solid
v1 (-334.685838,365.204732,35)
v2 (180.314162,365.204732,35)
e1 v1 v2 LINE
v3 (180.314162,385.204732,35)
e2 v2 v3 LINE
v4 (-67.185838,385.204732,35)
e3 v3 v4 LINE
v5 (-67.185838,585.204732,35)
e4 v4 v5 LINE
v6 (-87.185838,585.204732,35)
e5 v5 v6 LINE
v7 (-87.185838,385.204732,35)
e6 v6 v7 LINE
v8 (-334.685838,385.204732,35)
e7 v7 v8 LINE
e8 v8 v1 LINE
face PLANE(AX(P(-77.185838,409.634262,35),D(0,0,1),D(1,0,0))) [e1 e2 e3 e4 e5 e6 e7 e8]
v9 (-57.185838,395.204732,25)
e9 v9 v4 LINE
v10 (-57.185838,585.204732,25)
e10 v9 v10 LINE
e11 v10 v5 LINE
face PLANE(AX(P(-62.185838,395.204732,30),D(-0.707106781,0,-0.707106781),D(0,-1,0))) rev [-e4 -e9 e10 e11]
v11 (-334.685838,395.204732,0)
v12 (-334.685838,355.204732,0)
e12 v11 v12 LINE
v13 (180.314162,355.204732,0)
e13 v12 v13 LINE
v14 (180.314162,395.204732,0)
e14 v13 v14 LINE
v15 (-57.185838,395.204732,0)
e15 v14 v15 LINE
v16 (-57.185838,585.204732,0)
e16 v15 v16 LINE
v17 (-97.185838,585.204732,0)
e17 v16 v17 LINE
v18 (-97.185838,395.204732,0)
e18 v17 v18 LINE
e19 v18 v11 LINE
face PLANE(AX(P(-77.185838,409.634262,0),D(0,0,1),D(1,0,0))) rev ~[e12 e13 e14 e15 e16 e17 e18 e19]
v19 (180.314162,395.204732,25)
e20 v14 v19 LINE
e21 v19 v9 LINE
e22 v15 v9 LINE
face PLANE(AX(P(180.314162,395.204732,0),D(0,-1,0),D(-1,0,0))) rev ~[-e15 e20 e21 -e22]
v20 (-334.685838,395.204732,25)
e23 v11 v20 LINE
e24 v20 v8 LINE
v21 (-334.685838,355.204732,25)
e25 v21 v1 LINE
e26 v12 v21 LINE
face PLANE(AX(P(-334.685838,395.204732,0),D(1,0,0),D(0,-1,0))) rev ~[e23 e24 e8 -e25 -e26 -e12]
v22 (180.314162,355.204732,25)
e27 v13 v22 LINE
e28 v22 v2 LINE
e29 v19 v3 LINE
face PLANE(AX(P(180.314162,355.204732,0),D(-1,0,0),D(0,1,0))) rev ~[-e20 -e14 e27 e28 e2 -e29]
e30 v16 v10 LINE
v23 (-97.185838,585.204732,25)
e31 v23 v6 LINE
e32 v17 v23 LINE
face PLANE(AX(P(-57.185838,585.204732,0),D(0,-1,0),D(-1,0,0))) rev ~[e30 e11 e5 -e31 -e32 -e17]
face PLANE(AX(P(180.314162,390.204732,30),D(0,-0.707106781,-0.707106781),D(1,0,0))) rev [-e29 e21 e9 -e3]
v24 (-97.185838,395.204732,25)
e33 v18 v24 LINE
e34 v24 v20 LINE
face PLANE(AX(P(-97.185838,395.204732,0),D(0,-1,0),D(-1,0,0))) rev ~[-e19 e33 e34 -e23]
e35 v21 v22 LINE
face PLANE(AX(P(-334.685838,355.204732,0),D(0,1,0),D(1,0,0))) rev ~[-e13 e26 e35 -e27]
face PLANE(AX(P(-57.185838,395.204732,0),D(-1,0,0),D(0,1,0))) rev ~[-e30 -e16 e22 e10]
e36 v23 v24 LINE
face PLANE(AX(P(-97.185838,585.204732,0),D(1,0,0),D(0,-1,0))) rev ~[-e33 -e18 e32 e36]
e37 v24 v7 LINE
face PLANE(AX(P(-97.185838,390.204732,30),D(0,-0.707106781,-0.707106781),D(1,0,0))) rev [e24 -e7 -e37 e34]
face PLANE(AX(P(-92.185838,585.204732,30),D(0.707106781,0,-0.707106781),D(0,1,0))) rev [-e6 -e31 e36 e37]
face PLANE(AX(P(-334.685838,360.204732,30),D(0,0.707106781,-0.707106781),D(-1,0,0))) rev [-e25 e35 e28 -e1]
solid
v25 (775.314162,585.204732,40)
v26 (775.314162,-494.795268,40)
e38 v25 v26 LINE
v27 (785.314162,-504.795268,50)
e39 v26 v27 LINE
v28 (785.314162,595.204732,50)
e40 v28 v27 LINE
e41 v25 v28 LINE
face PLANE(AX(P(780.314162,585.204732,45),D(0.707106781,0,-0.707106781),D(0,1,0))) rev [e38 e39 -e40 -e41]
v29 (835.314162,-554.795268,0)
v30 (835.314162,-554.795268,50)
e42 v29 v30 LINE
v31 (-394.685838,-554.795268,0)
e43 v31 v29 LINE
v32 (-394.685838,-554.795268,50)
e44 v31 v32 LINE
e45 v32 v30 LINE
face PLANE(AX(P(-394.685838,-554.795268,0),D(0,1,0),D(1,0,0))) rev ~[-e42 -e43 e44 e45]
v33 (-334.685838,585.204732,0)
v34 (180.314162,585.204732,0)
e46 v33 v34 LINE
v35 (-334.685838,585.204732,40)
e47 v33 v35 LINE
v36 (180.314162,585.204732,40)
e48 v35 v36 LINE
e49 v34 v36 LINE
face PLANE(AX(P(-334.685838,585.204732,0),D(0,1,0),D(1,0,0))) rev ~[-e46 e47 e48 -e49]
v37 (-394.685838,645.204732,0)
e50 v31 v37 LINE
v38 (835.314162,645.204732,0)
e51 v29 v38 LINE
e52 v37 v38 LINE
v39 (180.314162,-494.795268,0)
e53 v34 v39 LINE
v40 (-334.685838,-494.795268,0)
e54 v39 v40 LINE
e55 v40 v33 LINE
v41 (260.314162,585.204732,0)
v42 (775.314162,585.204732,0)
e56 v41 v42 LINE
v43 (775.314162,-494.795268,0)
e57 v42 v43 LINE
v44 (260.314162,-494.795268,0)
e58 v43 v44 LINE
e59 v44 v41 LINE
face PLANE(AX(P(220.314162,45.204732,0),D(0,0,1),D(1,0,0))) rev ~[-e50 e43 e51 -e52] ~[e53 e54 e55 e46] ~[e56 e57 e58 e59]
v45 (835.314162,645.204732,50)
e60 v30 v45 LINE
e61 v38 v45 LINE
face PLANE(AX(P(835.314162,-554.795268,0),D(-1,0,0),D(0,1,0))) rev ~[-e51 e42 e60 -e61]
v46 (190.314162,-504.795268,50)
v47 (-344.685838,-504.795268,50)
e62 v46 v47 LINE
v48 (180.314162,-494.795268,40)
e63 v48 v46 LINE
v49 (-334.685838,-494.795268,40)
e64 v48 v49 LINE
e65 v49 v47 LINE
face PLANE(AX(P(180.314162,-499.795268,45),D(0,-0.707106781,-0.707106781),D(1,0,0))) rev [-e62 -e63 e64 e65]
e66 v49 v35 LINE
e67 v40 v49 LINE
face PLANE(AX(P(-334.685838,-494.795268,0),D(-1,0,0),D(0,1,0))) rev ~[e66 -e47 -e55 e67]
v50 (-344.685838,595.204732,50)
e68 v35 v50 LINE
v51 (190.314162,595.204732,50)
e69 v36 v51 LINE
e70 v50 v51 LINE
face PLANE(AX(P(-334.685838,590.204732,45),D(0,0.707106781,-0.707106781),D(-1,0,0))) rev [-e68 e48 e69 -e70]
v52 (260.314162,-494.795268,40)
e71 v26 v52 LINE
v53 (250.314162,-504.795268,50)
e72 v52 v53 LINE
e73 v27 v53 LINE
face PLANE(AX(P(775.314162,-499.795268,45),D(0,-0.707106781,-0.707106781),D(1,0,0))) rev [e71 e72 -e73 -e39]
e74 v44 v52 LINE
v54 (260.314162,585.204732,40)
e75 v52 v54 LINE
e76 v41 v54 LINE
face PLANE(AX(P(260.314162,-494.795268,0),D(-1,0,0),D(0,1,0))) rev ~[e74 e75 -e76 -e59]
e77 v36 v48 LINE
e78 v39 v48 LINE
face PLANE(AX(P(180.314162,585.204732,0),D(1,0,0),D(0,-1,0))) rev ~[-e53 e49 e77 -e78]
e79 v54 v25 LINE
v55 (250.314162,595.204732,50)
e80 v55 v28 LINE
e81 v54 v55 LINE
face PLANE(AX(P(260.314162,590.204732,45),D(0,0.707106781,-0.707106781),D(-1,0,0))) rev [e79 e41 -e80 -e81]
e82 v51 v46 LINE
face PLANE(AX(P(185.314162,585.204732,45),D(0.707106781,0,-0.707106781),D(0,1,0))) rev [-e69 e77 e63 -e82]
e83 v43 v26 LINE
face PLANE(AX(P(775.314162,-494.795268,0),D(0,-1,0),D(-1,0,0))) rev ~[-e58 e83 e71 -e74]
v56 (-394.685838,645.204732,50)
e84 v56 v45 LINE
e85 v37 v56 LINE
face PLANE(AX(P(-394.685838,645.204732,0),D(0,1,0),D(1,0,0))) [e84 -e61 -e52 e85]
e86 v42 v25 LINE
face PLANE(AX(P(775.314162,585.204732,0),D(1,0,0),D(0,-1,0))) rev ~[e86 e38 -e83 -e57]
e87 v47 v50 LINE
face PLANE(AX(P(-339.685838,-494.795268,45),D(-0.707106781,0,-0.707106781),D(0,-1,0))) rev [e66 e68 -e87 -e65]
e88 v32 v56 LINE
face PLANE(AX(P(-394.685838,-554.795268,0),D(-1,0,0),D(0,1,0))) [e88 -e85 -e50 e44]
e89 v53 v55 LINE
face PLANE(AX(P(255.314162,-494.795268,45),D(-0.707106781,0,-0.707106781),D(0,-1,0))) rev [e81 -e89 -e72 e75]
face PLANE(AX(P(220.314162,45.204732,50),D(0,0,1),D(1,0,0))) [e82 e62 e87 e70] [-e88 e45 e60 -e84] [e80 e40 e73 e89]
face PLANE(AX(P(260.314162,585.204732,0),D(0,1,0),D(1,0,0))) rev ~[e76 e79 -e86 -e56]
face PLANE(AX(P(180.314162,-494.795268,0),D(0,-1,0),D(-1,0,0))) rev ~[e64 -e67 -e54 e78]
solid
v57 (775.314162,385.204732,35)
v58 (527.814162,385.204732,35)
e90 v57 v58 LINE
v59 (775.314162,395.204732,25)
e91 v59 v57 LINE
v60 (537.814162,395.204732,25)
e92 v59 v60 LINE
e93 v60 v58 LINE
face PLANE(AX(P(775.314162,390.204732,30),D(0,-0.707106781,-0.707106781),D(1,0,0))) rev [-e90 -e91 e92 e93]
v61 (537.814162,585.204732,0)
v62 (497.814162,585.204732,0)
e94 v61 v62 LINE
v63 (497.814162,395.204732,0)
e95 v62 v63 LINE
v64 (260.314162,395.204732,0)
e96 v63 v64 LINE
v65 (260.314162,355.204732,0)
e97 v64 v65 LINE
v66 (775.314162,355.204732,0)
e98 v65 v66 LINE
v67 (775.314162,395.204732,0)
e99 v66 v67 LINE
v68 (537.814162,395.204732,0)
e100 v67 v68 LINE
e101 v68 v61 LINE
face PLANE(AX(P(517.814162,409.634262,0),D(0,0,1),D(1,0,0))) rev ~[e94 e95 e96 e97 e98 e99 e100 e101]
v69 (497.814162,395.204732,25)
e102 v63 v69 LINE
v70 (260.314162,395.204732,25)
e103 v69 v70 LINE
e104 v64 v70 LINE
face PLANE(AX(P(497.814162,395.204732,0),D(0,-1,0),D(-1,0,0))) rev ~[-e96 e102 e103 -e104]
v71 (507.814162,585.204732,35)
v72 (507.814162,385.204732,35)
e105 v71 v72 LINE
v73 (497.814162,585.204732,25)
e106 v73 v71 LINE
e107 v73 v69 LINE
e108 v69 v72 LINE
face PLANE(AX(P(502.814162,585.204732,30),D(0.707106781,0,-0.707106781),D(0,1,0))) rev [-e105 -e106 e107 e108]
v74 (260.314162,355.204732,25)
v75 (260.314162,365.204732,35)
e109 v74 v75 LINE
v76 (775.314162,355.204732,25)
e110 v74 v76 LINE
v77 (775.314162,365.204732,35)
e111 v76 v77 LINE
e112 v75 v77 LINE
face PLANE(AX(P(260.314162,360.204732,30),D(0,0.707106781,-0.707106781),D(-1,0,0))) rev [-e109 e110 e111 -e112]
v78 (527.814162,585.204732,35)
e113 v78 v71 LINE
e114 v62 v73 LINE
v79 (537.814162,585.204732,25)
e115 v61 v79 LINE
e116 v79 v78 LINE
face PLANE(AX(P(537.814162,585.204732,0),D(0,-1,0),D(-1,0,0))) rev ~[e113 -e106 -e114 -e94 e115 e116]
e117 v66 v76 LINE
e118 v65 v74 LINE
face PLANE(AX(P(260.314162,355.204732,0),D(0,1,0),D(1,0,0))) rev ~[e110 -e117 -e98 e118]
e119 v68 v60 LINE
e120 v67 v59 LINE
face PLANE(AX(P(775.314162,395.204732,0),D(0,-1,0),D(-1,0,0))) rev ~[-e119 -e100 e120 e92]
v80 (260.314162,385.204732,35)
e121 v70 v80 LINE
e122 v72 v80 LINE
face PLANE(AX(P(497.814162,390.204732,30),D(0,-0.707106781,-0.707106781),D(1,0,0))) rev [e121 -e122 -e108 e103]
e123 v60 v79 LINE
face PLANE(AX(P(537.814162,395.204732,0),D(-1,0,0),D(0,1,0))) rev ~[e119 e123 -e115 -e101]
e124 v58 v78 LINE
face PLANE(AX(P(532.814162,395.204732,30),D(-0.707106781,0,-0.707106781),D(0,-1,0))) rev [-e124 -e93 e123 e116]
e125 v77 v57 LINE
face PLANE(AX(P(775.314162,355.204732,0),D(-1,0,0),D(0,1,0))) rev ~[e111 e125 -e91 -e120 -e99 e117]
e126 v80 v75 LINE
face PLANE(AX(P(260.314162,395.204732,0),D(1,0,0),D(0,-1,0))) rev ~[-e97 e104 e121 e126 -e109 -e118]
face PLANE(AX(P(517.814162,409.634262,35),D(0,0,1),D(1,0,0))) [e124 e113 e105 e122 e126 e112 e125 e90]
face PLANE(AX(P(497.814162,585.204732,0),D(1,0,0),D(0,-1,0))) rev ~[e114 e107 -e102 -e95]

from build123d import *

# Parameters (mm, degrees)
F0_W      = 1230
F0_H      = 1200
F1_DEPTH  = 50
F2_DEPTH  = 35
F3_SIZE   = 10
F3_2_SIZE = 10
F3_3_SIZE = 10


with BuildPart() as f1:
    # F0 (on Top) → F1 (new body)
    with BuildSketch(Plane.XY):
        with Locations((220.3141621128, 45.2047318473)):
            Rectangle(F0_W, F0_H)
        Polygon((-334.6858378872, -494.7952681527), (-334.6858378872, 355.2047318473), (-334.6858378872, 395.2047318473), (-334.6858378872, 585.2047318473), (-97.1858378872, 585.2047318473), (-57.1858378872, 585.2047318473), (180.3141621128, 585.2047318473), (180.3141621128, 395.2047318473), (180.3141621128, 355.2047318473), (180.3141621128, -494.7952681527), align=None, mode=Mode.SUBTRACT)
        Polygon((260.3141621128, -494.7952681527), (260.3141621128, 355.2047318473), (260.3141621128, 395.2047318473), (260.3141621128, 585.2047318473), (497.8141621128, 585.2047318473), (537.8141621128, 585.2047318473), (775.3141621128, 585.2047318473), (775.3141621128, 395.2047318473), (775.3141621128, 355.2047318473), (775.3141621128, -494.7952681527), align=None, mode=Mode.SUBTRACT)
    extrude(amount=F1_DEPTH)

    # F3
    f3_edges = [f1.edges().sort_by_distance(p)[0] for p in [
        (-334.685838, 45.204732, 50),
        (-77.185838, 585.204732, 50),
        (180.314162, 45.204732, 50),
        (260.314162, 45.204732, 50),
        (517.814162, 585.204732, 50),
        (775.314162, 45.204732, 50),
        (517.814162, -494.795268, 50),
        (-77.185838, -494.795268, 50),
    ]]
    chamfer(f3_edges, length=F3_SIZE)


with BuildPart() as f2:
    # F0 (on Top) → F2 (new body)
    with BuildSketch(Plane.XY):
        Polygon((-334.6858378872, 395.2047318473), (-334.6858378872, 355.2047318473), (180.3141621128, 355.2047318473), (180.3141621128, 395.2047318473), (-57.1858378872, 395.2047318473), (-57.1858378872, 585.2047318473), (-97.1858378872, 585.2047318473), (-97.1858378872, 395.2047318473), align=None)
    extrude(amount=F2_DEPTH)

    # F3#2
    f3_2_edges = [f2.edges().sort_by_distance(p)[0] for p in [
        (-77.185838, 355.204732, 35),
        (61.564162, 395.204732, 35),
        (-57.185838, 490.204732, 35),
        (-97.185838, 490.204732, 35),
        (-215.935838, 395.204732, 35),
    ]]
    chamfer(f3_2_edges, length=F3_2_SIZE)


with BuildPart() as f2b:
    # F0 (on Top) → F2, piece 2 (new body)
    with BuildSketch(Plane.XY):
        Polygon((260.3141621128, 395.2047318473), (260.3141621128, 355.2047318473), (775.3141621128, 355.2047318473), (775.3141621128, 395.2047318473), (537.8141621128, 395.2047318473), (537.8141621128, 585.2047318473), (497.8141621128, 585.2047318473), (497.8141621128, 395.2047318473), align=None)
    extrude(amount=F2_DEPTH)

    # F3#3
    f3_3_edges = [f2b.edges().sort_by_distance(p)[0] for p in [
        (517.814162, 355.204732, 35),
        (379.064162, 395.204732, 35),
        (537.814162, 490.204732, 35),
        (656.564162, 395.204732, 35),
        (497.814162, 490.204732, 35),
    ]]
    chamfer(f3_3_edges, length=F3_3_SIZE)


solid = Compound([f1.part, f2.part, f2b.part])
